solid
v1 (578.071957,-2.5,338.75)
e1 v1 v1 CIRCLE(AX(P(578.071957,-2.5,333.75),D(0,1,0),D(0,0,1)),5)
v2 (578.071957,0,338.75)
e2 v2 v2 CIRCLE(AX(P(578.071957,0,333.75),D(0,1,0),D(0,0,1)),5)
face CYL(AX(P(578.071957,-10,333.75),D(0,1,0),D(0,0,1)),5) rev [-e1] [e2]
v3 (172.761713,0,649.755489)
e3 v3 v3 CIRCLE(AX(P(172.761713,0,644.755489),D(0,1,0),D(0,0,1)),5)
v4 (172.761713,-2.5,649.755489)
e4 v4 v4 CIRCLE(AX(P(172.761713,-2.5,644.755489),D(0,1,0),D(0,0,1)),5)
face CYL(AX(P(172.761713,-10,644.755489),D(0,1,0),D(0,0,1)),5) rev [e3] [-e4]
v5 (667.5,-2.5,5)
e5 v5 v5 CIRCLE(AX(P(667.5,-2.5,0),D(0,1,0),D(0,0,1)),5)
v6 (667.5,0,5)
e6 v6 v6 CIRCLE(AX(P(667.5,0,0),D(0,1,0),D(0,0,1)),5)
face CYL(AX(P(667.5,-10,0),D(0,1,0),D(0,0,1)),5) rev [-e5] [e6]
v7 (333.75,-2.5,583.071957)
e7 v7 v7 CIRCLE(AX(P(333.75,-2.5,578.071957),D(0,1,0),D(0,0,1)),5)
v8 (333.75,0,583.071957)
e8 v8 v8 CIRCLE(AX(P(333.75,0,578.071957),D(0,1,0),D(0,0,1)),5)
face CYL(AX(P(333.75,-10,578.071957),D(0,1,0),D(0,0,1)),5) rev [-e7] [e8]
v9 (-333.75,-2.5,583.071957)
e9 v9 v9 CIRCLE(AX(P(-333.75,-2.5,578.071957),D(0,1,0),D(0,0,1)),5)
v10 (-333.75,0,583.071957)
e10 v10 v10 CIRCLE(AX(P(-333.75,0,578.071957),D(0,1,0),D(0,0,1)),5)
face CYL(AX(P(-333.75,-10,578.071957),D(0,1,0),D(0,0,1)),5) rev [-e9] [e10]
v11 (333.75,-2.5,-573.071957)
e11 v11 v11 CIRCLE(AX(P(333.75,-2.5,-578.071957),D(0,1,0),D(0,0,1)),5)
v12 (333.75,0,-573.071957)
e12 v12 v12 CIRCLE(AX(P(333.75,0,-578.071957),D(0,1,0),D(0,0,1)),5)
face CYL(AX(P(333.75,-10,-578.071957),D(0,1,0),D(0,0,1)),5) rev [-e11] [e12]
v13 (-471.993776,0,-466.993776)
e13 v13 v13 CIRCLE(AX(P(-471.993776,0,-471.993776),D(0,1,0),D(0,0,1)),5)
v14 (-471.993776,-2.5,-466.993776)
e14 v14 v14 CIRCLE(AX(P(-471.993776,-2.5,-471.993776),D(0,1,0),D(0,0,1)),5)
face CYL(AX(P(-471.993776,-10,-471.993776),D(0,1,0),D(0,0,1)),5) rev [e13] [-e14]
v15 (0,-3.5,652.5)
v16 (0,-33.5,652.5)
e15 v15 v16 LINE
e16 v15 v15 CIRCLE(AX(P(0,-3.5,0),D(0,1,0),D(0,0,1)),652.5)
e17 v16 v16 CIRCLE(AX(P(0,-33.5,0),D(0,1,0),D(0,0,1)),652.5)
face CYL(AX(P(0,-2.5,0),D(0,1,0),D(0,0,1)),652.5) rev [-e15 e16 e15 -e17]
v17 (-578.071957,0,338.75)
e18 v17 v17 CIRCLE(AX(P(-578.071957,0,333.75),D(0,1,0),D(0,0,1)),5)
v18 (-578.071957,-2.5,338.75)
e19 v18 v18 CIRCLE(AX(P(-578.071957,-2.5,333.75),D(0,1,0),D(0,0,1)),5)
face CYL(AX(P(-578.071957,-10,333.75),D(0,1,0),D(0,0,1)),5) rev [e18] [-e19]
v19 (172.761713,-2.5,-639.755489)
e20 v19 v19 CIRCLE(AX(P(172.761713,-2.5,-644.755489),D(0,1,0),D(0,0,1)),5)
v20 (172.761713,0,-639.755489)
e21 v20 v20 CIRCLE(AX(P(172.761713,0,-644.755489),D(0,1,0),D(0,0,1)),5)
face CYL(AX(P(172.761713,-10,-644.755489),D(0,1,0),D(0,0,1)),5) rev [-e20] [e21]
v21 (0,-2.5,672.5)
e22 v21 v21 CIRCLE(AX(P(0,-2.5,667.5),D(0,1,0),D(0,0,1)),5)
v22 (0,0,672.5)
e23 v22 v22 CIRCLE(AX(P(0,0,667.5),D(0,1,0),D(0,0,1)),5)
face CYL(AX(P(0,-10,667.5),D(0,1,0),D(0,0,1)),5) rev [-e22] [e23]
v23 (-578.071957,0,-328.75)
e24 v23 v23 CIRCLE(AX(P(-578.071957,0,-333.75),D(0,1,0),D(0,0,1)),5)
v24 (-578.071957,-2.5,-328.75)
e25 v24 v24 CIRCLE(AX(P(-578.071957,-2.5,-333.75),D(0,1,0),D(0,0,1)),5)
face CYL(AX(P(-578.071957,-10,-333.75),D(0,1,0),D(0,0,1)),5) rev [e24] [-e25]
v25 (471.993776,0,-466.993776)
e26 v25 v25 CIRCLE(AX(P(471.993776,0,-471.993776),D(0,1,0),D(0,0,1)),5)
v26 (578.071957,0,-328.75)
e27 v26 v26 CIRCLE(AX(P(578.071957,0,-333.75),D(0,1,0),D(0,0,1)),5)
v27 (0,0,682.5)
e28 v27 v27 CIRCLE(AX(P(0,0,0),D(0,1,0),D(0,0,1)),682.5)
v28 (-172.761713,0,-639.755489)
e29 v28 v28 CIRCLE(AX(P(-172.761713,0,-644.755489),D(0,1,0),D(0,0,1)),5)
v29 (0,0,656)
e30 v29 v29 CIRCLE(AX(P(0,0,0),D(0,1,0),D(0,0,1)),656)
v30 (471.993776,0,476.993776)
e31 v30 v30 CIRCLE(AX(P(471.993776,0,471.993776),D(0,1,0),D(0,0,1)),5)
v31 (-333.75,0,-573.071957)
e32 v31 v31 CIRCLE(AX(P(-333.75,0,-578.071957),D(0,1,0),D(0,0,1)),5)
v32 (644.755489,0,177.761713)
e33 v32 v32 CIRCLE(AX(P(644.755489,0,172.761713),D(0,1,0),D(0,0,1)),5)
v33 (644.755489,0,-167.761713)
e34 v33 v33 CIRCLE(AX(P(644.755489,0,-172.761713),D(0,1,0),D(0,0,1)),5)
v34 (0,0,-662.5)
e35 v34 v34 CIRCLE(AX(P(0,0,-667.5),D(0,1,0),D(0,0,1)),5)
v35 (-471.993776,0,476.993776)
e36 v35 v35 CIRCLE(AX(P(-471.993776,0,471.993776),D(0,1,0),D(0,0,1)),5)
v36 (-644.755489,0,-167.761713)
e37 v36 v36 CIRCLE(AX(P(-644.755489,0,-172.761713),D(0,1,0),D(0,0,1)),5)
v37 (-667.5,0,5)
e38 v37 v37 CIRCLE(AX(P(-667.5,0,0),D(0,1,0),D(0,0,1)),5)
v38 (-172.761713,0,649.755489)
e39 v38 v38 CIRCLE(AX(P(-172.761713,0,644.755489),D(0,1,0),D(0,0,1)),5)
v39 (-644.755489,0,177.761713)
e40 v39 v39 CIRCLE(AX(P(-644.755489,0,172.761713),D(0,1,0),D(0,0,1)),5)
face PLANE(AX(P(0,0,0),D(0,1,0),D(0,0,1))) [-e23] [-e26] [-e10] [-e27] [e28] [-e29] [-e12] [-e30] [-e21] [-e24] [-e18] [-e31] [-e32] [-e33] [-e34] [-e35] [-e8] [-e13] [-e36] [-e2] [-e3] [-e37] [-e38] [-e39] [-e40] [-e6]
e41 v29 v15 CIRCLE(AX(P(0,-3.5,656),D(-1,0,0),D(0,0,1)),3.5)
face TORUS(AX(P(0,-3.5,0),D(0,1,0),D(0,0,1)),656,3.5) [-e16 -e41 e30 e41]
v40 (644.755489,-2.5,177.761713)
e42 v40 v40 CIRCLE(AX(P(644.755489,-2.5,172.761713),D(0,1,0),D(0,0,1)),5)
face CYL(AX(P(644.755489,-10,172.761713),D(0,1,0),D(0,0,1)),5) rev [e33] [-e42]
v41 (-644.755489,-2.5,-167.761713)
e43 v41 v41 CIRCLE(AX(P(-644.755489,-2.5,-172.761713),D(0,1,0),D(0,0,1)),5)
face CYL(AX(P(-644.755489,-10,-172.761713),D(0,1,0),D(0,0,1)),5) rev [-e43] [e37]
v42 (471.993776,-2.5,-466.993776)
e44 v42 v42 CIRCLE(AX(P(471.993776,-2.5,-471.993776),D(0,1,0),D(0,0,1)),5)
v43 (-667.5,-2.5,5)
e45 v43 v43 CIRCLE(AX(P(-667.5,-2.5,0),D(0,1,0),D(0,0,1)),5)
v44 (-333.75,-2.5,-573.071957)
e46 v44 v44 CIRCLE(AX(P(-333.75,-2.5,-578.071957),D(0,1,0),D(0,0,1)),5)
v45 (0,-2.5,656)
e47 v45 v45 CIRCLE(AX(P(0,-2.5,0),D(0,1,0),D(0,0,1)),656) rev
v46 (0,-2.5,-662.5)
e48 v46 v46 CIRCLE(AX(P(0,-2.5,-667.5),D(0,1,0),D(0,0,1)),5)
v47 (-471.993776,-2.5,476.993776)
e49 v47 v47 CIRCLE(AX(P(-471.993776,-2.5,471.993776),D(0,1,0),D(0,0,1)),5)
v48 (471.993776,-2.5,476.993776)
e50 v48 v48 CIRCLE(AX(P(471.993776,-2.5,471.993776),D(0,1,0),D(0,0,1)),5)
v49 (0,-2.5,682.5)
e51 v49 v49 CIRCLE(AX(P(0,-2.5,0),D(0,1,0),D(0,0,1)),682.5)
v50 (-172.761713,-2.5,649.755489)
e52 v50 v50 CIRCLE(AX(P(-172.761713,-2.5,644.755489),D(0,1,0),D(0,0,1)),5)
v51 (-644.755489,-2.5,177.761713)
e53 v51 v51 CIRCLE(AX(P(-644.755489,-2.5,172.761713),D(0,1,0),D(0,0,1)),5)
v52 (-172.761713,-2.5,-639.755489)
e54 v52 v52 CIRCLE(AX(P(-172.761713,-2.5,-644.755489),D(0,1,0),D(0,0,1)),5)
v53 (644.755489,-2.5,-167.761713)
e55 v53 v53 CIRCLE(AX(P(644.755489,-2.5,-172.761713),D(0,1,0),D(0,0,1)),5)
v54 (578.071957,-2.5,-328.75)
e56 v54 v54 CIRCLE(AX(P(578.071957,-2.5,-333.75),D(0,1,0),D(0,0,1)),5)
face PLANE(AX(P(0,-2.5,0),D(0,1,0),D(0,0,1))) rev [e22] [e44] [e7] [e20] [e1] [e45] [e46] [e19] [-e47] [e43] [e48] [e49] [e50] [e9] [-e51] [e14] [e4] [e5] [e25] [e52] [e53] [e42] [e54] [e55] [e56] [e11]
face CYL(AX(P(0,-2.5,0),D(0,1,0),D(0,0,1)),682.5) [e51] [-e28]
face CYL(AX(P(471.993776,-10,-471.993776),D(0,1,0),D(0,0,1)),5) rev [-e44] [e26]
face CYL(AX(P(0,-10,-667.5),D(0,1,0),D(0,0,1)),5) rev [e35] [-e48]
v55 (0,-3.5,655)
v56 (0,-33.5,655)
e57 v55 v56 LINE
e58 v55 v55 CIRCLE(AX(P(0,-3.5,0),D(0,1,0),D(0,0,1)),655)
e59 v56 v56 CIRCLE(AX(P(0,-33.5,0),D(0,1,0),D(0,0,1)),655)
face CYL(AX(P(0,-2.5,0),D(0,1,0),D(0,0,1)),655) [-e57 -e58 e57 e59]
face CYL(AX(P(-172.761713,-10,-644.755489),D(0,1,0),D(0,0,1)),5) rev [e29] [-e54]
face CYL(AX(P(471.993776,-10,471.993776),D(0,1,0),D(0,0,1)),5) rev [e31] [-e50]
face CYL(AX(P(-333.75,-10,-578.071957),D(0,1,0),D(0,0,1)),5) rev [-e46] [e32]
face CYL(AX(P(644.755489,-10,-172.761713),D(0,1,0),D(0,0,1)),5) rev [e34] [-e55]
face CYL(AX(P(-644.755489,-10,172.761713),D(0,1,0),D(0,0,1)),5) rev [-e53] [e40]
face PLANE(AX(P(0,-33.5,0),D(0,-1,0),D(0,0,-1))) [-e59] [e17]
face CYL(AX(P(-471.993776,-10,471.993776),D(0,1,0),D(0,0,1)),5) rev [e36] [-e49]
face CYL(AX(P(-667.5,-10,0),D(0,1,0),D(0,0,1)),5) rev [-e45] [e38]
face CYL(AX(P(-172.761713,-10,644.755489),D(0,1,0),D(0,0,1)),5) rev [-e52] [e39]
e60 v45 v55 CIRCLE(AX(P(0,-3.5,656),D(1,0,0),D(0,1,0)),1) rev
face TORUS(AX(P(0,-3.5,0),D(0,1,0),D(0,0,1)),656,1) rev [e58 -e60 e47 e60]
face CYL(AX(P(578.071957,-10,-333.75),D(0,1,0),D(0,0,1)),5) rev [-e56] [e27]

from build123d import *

# Parameters (mm, degrees)
SKETCH1_R          = 682.5
SKETCH1_R_2        = 652.5
BASE_FLANGE1_DEPTH = 2.5
SKETCH8_R          = 5
CUT_EXTRUDE1_DEPTH = 10


# Read off the part's stored shape, not the designer's step: Edge-Flange1
# Sheet-metal steps are written as plain solids
with BuildPart() as part:
    # Sketch1 → Base-Flange1 (new body)
    with BuildSketch(Plane(origin=(0, 0, 0), x_dir=(1, 0, 0), z_dir=(0, 1, 0))):
        with Locations(Location((0, 0, 0), (0, 0, 270))):
            Circle(SKETCH1_R)
        with Locations(Location((0, 0, 0), (0, 0, 270))):
            Circle(SKETCH1_R_2, mode=Mode.SUBTRACT)
    extrude(amount=-BASE_FLANGE1_DEPTH)

    # Edge-Flange1 outline → Edge-Flange1 (revolve, cut)
    with BuildSketch(Plane.XY):
        with BuildLine():
            Line((652.5, -2.5), (652.645898034, -2.5))
            ThreePointArc((652.645898034, -2.5), (653.908349934, -0.69375696), (656, 0))
            Line((656, 0), (652.5, 0))
            Line((652.5, 0), (652.5, -2.5))
        make_face()
    revolve(axis=Axis((0, 0, 0), (0, 1, 0)), mode=Mode.SUBTRACT)

    # Edge-Flange1 2 outline → Edge-Flange1 2 (revolve)
    with BuildSketch(Plane.XY):
        with BuildLine():
            Line((652.5, -3.5), (652.5, -33.5))
            Line((652.5, -33.5), (655, -33.5))
            Line((655, -33.5), (655, -3.5))
            ThreePointArc((655, -3.5), (655.292893219, -2.792893219), (656, -2.5))
            Line((656, -2.5), (652.645898034, -2.5))
            ThreePointArc((652.645898034, -2.5), (652.536666571, -2.994706462), (652.5, -3.5))
        make_face()
    revolve(axis=Axis((0, 0, 0), (0, 1, 0)))

    # Sketch8 → Cut-Extrude1 (cut)
    with BuildSketch(Plane(origin=(0, 0, 0), x_dir=(1, 0, 0), z_dir=(0, 1, 0))):
        with Locations(Location((172.761712606, 644.755489048, 0), (0, 0, 270))):
            Circle(SKETCH8_R)
        with Locations(Location((333.75, 578.071957026, 0), (0, 0, 270))):
            Circle(SKETCH8_R)
        with Locations(Location((0, 667.5, 0), (0, 0, 270))):
            Circle(SKETCH8_R)
        with Locations(Location((471.993776442, 471.993776442, 0), (0, 0, 270))):
            Circle(SKETCH8_R)
        with Locations(Location((578.071957026, 333.75, 0), (0, 0, 270))):
            Circle(SKETCH8_R)
        with Locations(Location((644.755489048, 172.761712606, 0), (0, 0, 270))):
            Circle(SKETCH8_R)
        with Locations(Location((667.5, 0, 0), (0, 0, 270))):
            Circle(SKETCH8_R)
        with Locations(Location((644.755489048, -172.761712606, 0), (0, 0, 270))):
            Circle(SKETCH8_R)
        with Locations(Location((578.071957026, -333.75, 0), (0, 0, 270))):
            Circle(SKETCH8_R)
        with Locations(Location((471.993776442, -471.993776442, 0), (0, 0, 270))):
            Circle(SKETCH8_R)
        with Locations(Location((333.75, -578.071957026, 0), (0, 0, 270))):
            Circle(SKETCH8_R)
        with Locations(Location((172.761712606, -644.755489048, 0), (0, 0, 270))):
            Circle(SKETCH8_R)
        with Locations(Location((0, -667.5, 0), (0, 0, 270))):
            Circle(SKETCH8_R)
        with Locations(Location((-172.761712606, -644.755489048, 0), (0, 0, 270))):
            Circle(SKETCH8_R)
        with Locations(Location((-333.75, -578.071957026, 0), (0, 0, 270))):
            Circle(SKETCH8_R)
        with Locations(Location((-471.993776442, -471.993776442, 0), (0, 0, 270))):
            Circle(SKETCH8_R)
        with Locations(Location((-578.071957026, -333.75, 0), (0, 0, 270))):
            Circle(SKETCH8_R)
        with Locations(Location((-644.755489048, -172.761712606, 0), (0, 0, 270))):
            Circle(SKETCH8_R)
        with Locations(Location((-667.5, 0, 0), (0, 0, 270))):
            Circle(SKETCH8_R)
        with Locations(Location((-644.755489048, 172.761712606, 0), (0, 0, 270))):
            Circle(SKETCH8_R)
        with Locations(Location((-578.071957026, 333.75, 0), (0, 0, 270))):
            Circle(SKETCH8_R)
        with Locations(Location((-471.993776442, 471.993776442, 0), (0, 0, 270))):
            Circle(SKETCH8_R)
        with Locations(Location((-333.75, 578.071957026, 0), (0, 0, 270))):
            Circle(SKETCH8_R)
        with Locations(Location((-172.761712606, 644.755489048, 0), (0, 0, 270))):
            Circle(SKETCH8_R)
    extrude(amount=-CUT_EXTRUDE1_DEPTH, mode=Mode.SUBTRACT)


solid = part.part
